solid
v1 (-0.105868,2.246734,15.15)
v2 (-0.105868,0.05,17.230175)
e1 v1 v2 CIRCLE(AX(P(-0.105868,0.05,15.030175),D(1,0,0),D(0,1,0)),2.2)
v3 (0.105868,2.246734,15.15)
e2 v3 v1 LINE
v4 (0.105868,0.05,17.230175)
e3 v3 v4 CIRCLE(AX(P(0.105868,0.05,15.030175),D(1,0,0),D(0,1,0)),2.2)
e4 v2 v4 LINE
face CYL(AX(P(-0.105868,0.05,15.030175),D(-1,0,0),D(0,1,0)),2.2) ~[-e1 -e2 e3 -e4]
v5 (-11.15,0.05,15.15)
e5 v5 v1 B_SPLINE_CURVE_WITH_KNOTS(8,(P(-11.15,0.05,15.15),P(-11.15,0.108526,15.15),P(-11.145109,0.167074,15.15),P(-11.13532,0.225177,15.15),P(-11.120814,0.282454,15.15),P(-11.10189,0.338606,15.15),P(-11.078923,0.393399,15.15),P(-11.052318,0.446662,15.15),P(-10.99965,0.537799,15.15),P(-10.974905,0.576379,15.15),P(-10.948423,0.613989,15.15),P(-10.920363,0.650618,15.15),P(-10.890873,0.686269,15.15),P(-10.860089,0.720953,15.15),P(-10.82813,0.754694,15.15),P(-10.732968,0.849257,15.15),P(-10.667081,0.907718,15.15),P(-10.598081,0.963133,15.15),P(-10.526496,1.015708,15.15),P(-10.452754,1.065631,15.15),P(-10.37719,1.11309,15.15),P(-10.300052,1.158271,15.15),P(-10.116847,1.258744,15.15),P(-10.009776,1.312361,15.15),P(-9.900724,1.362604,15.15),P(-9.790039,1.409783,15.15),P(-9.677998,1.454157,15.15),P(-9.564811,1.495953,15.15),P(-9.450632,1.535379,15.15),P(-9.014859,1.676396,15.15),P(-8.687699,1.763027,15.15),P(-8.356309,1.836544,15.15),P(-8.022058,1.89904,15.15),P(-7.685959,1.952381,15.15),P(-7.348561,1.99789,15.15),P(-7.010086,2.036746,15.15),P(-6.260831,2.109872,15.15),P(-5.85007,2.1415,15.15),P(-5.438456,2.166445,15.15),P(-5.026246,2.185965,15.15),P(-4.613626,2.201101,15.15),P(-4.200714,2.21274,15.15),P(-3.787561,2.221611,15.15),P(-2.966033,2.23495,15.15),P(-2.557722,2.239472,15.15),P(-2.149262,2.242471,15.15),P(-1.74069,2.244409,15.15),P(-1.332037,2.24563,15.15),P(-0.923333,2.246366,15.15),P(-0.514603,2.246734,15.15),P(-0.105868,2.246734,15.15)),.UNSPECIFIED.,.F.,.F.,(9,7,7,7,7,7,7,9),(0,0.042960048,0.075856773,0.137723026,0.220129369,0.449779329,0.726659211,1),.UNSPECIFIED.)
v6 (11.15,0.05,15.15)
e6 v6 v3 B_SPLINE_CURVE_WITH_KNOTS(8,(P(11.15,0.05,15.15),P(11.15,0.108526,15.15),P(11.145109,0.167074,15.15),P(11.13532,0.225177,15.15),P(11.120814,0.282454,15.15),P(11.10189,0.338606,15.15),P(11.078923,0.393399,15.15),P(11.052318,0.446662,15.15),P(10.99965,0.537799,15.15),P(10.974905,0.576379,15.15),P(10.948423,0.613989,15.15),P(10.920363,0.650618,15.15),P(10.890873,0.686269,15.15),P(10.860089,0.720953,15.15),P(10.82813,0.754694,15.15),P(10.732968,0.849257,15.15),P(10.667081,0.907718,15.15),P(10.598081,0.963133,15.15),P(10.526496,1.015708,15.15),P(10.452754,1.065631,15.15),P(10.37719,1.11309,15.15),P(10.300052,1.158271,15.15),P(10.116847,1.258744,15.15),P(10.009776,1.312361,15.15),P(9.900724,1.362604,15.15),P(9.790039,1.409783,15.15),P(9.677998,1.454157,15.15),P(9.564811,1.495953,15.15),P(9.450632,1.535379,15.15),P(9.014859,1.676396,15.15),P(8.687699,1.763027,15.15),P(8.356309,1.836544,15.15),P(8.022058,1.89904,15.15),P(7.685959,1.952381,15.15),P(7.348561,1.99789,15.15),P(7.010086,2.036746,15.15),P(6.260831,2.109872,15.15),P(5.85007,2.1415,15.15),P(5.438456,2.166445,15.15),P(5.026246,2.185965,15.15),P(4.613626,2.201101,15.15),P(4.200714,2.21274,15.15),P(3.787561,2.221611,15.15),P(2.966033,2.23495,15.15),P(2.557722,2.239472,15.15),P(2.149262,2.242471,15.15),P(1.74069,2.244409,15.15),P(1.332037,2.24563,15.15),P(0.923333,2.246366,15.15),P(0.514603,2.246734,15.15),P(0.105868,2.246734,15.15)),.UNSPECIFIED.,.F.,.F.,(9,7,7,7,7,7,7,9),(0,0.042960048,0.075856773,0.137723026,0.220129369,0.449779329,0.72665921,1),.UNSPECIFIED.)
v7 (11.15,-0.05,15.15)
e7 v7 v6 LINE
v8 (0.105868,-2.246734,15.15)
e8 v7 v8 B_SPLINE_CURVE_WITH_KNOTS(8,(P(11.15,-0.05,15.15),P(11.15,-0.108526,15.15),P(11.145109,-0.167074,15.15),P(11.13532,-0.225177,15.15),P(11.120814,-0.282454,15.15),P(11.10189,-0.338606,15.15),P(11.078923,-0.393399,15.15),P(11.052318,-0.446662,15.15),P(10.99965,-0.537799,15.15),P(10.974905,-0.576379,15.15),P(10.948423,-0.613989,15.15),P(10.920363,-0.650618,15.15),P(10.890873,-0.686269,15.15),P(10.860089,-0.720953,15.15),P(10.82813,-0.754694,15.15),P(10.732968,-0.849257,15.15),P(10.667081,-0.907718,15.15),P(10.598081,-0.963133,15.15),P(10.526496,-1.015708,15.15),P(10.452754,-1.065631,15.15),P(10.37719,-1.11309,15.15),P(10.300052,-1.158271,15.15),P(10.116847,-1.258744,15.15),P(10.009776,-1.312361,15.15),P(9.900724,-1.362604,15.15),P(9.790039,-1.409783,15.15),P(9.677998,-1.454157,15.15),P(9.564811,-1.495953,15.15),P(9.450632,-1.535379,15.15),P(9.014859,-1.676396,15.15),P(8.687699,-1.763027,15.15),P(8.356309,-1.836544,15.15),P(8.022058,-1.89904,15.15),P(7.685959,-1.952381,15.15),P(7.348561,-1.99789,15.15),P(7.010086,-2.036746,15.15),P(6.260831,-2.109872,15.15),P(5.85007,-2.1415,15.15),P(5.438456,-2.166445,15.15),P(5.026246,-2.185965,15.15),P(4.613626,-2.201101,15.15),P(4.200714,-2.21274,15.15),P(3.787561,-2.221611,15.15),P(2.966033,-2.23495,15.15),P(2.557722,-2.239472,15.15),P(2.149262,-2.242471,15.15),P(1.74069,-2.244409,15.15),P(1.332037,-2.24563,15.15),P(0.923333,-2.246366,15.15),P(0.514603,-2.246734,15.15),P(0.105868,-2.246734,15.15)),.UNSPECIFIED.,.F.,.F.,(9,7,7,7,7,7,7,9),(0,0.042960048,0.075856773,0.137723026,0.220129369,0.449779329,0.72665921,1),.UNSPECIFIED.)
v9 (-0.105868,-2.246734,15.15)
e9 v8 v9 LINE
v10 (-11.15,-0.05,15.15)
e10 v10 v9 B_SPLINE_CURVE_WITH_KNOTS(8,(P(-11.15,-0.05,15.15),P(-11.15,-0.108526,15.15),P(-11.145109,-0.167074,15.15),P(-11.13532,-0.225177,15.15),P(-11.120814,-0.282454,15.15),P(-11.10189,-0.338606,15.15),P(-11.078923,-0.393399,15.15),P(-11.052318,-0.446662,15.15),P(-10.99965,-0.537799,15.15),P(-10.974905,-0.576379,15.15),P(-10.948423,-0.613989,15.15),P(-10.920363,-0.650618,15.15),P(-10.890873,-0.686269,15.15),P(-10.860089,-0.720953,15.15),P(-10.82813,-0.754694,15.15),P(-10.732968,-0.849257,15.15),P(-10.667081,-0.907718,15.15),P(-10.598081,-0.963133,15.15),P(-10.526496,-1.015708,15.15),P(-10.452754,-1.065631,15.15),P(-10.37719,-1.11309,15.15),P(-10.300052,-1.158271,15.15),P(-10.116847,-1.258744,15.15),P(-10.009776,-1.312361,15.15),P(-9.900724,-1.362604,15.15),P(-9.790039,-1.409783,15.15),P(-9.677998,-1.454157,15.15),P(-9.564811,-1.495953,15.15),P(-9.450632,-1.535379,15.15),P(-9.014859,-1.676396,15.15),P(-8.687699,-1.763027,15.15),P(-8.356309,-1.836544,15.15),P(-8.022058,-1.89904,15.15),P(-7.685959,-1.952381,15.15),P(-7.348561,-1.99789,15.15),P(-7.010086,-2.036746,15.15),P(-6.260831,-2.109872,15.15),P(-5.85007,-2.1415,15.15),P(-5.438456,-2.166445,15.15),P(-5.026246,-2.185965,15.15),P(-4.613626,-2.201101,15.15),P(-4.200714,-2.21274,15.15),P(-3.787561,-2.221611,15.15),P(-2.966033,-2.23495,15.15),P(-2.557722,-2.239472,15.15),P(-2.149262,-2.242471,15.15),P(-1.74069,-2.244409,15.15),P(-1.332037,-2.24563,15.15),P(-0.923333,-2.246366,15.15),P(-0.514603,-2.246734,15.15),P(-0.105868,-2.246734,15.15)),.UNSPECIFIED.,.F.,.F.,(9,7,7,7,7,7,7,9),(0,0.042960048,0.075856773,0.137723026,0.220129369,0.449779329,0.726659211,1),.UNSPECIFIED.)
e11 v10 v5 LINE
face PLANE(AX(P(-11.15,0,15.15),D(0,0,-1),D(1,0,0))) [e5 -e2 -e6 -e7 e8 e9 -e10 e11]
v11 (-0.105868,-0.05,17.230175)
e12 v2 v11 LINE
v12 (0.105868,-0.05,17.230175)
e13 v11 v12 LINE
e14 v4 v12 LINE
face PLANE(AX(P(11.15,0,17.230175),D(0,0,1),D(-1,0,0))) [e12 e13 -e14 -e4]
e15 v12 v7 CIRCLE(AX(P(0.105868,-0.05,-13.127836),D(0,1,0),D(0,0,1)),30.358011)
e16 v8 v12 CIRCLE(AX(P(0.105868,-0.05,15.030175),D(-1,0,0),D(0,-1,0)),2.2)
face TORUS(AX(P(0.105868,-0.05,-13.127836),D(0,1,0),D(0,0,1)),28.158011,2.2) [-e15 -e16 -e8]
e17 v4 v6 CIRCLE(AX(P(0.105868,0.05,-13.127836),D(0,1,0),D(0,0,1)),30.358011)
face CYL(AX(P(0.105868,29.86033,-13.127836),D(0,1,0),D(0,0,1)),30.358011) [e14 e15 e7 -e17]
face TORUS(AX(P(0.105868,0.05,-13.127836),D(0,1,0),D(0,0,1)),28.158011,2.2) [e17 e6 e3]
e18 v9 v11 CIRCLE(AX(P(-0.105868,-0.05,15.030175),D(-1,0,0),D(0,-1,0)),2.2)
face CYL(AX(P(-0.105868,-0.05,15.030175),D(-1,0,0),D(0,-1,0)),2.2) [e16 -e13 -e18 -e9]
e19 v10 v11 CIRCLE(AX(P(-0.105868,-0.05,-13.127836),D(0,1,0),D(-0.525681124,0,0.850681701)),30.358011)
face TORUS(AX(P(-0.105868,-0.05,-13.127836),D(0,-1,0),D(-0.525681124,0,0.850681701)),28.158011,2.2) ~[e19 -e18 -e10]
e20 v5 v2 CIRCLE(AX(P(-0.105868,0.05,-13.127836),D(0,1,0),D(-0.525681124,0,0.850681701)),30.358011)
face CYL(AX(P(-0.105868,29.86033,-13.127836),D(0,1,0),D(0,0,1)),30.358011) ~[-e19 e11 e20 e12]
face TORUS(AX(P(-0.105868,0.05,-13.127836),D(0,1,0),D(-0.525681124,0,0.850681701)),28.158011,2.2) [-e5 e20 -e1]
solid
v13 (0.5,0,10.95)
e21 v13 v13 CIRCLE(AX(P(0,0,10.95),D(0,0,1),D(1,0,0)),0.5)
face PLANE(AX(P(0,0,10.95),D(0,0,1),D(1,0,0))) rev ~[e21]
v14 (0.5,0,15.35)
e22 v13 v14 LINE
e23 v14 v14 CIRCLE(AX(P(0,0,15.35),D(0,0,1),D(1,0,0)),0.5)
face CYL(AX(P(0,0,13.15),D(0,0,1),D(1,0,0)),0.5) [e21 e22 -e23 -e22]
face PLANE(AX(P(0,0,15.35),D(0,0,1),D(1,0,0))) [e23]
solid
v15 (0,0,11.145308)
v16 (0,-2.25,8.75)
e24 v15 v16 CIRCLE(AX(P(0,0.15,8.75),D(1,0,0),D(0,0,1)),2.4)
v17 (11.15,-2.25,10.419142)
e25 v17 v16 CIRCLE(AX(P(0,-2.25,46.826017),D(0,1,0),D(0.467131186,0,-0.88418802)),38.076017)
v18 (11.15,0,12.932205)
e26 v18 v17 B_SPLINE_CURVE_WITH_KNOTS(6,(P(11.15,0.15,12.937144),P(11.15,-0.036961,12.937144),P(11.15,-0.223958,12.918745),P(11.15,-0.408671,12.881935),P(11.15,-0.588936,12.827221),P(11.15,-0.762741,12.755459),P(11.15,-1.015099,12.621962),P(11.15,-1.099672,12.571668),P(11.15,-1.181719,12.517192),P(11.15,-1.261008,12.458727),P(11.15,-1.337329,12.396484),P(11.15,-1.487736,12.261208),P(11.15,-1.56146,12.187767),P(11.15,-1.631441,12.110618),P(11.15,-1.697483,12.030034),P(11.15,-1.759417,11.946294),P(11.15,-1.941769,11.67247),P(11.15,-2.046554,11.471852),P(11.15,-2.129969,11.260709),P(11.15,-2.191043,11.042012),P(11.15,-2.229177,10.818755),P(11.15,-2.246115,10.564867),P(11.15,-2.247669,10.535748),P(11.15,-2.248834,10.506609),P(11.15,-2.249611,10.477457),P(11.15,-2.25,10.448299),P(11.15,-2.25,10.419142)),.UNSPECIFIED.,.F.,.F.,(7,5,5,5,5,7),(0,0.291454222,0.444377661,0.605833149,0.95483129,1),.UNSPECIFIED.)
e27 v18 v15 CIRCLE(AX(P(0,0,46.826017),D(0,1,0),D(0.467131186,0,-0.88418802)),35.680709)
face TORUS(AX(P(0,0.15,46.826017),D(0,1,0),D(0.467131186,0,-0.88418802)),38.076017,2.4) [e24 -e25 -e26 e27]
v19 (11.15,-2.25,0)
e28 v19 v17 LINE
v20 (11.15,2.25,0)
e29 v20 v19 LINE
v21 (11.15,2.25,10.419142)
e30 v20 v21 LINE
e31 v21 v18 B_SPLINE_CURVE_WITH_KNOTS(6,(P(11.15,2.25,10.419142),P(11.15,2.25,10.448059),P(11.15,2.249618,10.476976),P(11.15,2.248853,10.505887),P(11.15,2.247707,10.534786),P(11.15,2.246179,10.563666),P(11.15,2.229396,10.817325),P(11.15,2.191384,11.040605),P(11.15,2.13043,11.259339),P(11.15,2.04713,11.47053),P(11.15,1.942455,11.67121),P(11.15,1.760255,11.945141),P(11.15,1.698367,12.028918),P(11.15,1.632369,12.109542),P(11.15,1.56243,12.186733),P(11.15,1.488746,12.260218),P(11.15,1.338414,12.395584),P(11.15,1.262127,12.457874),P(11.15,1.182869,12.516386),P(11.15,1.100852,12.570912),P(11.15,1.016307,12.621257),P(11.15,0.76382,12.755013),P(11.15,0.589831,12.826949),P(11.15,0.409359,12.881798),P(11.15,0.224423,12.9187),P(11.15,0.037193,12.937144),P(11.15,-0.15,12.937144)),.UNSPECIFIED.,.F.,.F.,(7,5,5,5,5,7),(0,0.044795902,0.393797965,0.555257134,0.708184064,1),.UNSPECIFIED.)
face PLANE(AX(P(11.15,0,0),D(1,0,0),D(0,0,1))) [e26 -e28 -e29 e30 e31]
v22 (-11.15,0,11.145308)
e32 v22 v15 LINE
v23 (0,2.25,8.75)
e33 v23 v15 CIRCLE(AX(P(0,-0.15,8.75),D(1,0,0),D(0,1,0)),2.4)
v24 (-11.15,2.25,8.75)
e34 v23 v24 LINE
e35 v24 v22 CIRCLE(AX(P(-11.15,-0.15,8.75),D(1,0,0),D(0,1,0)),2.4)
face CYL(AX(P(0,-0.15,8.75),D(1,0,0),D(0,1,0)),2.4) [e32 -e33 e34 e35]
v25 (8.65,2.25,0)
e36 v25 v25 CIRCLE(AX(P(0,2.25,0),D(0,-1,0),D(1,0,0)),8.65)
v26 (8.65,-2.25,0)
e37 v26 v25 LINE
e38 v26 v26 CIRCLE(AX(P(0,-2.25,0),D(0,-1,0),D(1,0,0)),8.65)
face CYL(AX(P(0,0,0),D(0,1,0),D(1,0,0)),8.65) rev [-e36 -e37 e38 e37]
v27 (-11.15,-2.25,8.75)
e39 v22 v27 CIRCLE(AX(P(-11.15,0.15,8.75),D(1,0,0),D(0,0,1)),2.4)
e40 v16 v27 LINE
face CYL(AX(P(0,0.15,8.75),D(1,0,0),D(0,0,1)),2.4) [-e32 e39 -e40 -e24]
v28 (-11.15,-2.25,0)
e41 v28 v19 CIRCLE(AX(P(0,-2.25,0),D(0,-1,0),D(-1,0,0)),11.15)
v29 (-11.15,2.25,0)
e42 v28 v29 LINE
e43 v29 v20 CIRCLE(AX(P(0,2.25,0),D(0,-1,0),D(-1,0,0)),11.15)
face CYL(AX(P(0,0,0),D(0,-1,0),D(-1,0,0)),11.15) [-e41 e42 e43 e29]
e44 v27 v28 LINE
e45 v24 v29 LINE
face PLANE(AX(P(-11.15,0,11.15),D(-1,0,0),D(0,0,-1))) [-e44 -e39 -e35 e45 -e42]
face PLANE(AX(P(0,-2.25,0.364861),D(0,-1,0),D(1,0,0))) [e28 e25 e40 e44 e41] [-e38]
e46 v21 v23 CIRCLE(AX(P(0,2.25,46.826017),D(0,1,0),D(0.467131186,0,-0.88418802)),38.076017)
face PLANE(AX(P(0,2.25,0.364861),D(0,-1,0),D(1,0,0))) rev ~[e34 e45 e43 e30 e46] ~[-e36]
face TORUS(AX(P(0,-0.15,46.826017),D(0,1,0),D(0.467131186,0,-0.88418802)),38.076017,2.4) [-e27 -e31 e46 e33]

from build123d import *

# Parameters (mm, degrees)
F0_R          = 8.65
F1_DEPTH      = 2.25
F1_DEPTH_BACK = 2.25
F5_T1_DEPTH   = 59.7206593681
F6_T1_DEPTH   = 0.2117362528
F6_T4_ANGLE   = 31.7141074843
F6_T6_ANGLE   = 31.7141074843
F6_T8_ANGLE   = 31.7141074843
F6_T10_ANGLE  = 31.7141074843
F7_T3_DEPTH   = 17.15
F7_T6_DEPTH   = 17.15
F7_T9_ANGLE   = 27.8482361684
F7_T12_ANGLE  = 27.8482361684
F8_R          = 0.5
F9_DEPTH      = 2.2
F9_DEPTH_BACK = 2.2


# Not quite as in the source:
# - a fillet or chamfer that OpenCascade refuses, or shapes differently, is made with other operations: its cross-section is extruded or revolved along the edge and cut away or added
# - the program builds the solid bodies; features that only make, move or delete a surface that nothing else refers to are left out


with BuildPart() as f1:
    # F0 (on Front) → F1 (new body, two sides)
    with BuildSketch(Plane.XZ) as f1_sk:
        with BuildLine():
            ThreePointArc((-11.15, 0), (0, -11.15), (11.15, 0))
            ThreePointArc((11.15, 0), (7.8842406102, 7.8842406102), (0, 11.15))
            ThreePointArc((0, 11.15), (-7.8842406102, 7.8842406102), (-11.15, 0))
        make_face()
        Circle(F0_R, mode=Mode.SUBTRACT)
        with BuildLine():
            ThreePointArc((-11.15, 0), (-7.8842406102, 7.8842406102), (0, 11.15))
            Line((0, 11.15), (-4, 11.15))
            Line((-4, 11.15), (-9.15, 11.15))
            Line((-9.15, 11.15), (-11.15, 11.15))
            Line((-11.15, 11.15), (-11.15, 0))
        make_face()
        with BuildLine():
            ThreePointArc((0, 11.15), (7.8842406102, 7.8842406102), (11.15, 0))
            Line((11.15, 0), (11.15, 11.15))
            Line((11.15, 11.15), (0, 11.15))
        make_face()
        with BuildLine():
            ThreePointArc((11.15, 12.9371443763), (5.6461576541, 11.5996193357), (0, 11.15))
            Line((0, 11.15), (11.15, 11.15))
            Line((11.15, 11.15), (11.15, 12.9371443763))
        make_face()
    extrude(amount=F1_DEPTH)
    extrude(f1_sk.sketch, amount=-F1_DEPTH_BACK)

    # F7: fillet of radius 2.4 on 2 edges, made by hand


with BuildPart() as f1b:
    # F0 (on Front) → F1, piece 2 (new body, two sides)
    with BuildSketch(Plane.XZ) as f1_2_sk:
        Polygon((-9.15, 15.15), (-4, 15.15), (0, 15.15), (11.15, 15.15), (11.15, 17.2301754355), (-11.15, 17.2301754355), (-11.15, 15.15), align=None)
    extrude(amount=F1_DEPTH)
    extrude(f1_2_sk.sketch, amount=-F1_DEPTH_BACK)

    # F5: fillet of radius 30.3580112828 on 2 edges, made by hand

    # F5_s2 → F5_t1 (cut)
    with BuildSketch(Plane.XZ.offset(-29.8603296841)):
        with BuildLine():
            ThreePointArc((-0.1058681264, 17.2301754355), (-5.725031291, 16.7055993283), (-11.15, 15.15))
            Line((-11.15, 15.15), (-11.3708826375, 15.7155567169))
            ThreePointArc((-11.3708826375, 15.7155567169), (-11.7571602257, 16.1900877178), (-11.7571602257, 17.2301754355))
            Line((-11.7571602257, 17.2301754355), (-11.15, 17.8373356612))
            Line((-11.15, 17.8373356612), (-0.1058681264, 17.8373356612))
            Line((-0.1058681264, 17.8373356612), (-0.1058681264, 17.2301754355))
        make_face()
        with BuildLine():
            ThreePointArc((0.1058681264, 17.2301754355), (5.725031291, 16.7055993283), (11.15, 15.15))
            Line((11.15, 15.15), (11.3708826375, 15.7155567169))
            ThreePointArc((11.3708826375, 15.7155567169), (11.7571602257, 16.1900877178), (11.7571602257, 17.2301754355))
            Line((11.7571602257, 17.2301754355), (11.15, 17.8373356612))
            Line((11.15, 17.8373356612), (0.1058681264, 17.8373356612))
            Line((0.1058681264, 17.8373356612), (0.1058681264, 17.2301754355))
        make_face()
    extrude(amount=F5_T1_DEPTH, mode=Mode.SUBTRACT)

    # F6: fillet of radius 2.2 on 2 edges, made by hand

    # F6_s2 → F6_t1 (cut)
    with BuildSketch(Plane.YZ.offset(-0.1058681264)):
        with BuildLine():
            ThreePointArc((2.25, 15.0301754355), (1.6056349186, 16.5858103542), (0.05, 17.2301754355))
            Line((0.05, 17.2301754355), (2.25, 17.2301754355))
            Line((2.25, 17.2301754355), (2.25, 15.0301754355))
        make_face()
        with BuildLine():
            ThreePointArc((-2.25, 15.0301754355), (-1.6056349186, 16.5858103542), (-0.05, 17.2301754355))
            Line((-0.05, 17.2301754355), (-2.25, 17.2301754355))
            Line((-2.25, 17.2301754355), (-2.25, 15.0301754355))
        make_face()
    extrude(amount=F6_T1_DEPTH, mode=Mode.SUBTRACT)

    # F6_s3 → F6_t4 (revolve, cut)
    with BuildSketch(Plane(origin=(-5.9472140901, 0, -3.6750974915), x_dir=(0, 1, 0), z_dir=(-0.8506817009, 0, -0.5256811236))):
        with BuildLine():
            ThreePointArc((-0.05, -19.2460544304), (-1.6056349186, -18.601689349), (-2.25, -17.0460544304))
            Line((-2.25, -17.0460544304), (-2.25, -19.2460544304))
            Line((-2.25, -19.2460544304), (-0.05, -19.2460544304))
        make_face()
    revolve(axis=Axis((-0.1058681264, -2.25, -13.1278358476), (0, 1, 0)), revolution_arc=F6_T4_ANGLE, mode=Mode.SUBTRACT)

    # F6_s5 → F6_t6 (revolve, cut)
    with BuildSketch(Plane.YZ.offset(0.1058681264)):
        with BuildLine():
            ThreePointArc((0.05, 17.2301754355), (1.6056349186, 16.5858103541), (2.25, 15.0301754355))
            Line((2.25, 15.0301754355), (2.25, 17.2301754355))
            Line((2.25, 17.2301754355), (0.05, 17.2301754355))
        make_face()
    revolve(axis=Axis((0.1058681264, 2.25, -13.1278358476), (0, 1, 0)), revolution_arc=F6_T6_ANGLE, mode=Mode.SUBTRACT)

    # F6_s7 → F6_t8 (revolve, cut)
    with BuildSketch(Plane(origin=(-5.9472140901, 0, -3.6750974915), x_dir=(0, 1, 0), z_dir=(-0.8506817009, 0, -0.5256811236))):
        with BuildLine():
            ThreePointArc((0.05, -19.2460544304), (1.6056349186, -18.601689349), (2.25, -17.0460544304))
            Line((2.25, -17.0460544304), (2.25, -19.2460544304))
            Line((2.25, -19.2460544304), (0.05, -19.2460544304))
        make_face()
    revolve(axis=Axis((-0.1058681264, 2.25, -13.1278358476), (0, 1, 0)), revolution_arc=F6_T8_ANGLE, mode=Mode.SUBTRACT)

    # F6_s9 → F6_t10 (revolve, cut)
    with BuildSketch(Plane.YZ.offset(0.1058681264)):
        with BuildLine():
            ThreePointArc((-2.25, 15.0301754355), (-1.6056349186, 16.5858103541), (-0.05, 17.2301754355))
            Line((-0.05, 17.2301754355), (-2.25, 17.2301754355))
            Line((-2.25, 17.2301754355), (-2.25, 15.0301754355))
        make_face()
    revolve(axis=Axis((0.1058681264, -2.25, -13.1278358476), (0, 1, 0)), revolution_arc=F6_T10_ANGLE, mode=Mode.SUBTRACT)


with BuildPart() as f7_tool1:
    # F7_s2 → F7_t3 (new body)
    with BuildSketch(Plane.YZ):
        with BuildLine():
            ThreePointArc((0.15, 11.15), (-1.5470562748, 10.4470562748), (-2.25, 8.75))
            Line((-2.25, 8.75), (-2.25, 11.15))
            Line((-2.25, 11.15), (0.15, 11.15))
        make_face()
    extrude(amount=-F7_T3_DEPTH)


with BuildPart() as f7_tool4:
    # F7_s5 → F7_t6 (new body)
    with BuildSketch(Plane.YZ):
        with BuildLine():
            ThreePointArc((2.25, 8.75), (1.5470562748, 10.4470562748), (-0.15, 11.15))
            Line((-0.15, 11.15), (2.25, 11.15))
            Line((2.25, 11.15), (2.25, 8.75))
        make_face()
    extrude(amount=-F7_T6_DEPTH)


with BuildPart() as f7_tool7:
    # F7_s8 → F7_t9 (revolve)
    with BuildSketch(Plane(origin=(19.3406338701, 0, 10.217977433), x_dir=(0, 1, 0), z_dir=(0.8841880202, 0, 0.467131186))):
        with BuildLine():
            ThreePointArc((2.25, 3.3269863074), (1.5470562748, 5.0240425823), (-0.15, 5.7269863074))
            Line((-0.15, 5.7269863074), (2.25, 5.7269863074))
            Line((2.25, 5.7269863074), (2.25, 3.3269863074))
        make_face()
    revolve(axis=Axis((0, 2.25, 46.8260166415), (0, 1, 0)), revolution_arc=F7_T9_ANGLE)


with BuildPart() as f7_tool10:
    # F7_s11 → F7_t12 (revolve)
    with BuildSketch(Plane(origin=(19.3406338701, 0, 10.217977433), x_dir=(0, 1, 0), z_dir=(0.8841880202, 0, 0.467131186))):
        with BuildLine():
            ThreePointArc((0.15, 5.7269863074), (-1.5470562748, 5.0240425823), (-2.25, 3.3269863074))
            Line((-2.25, 3.3269863074), (-2.25, 5.7269863074))
            Line((-2.25, 5.7269863074), (0.15, 5.7269863074))
        make_face()
    revolve(axis=Axis((0, -2.25, 46.8260166415), (0, 1, 0)), revolution_arc=F7_T12_ANGLE)


with BuildPart() as f1_1:
    add(f1.part)

    # F7_t13: cut F7_tool1, F7_tool4, F7_tool7, F7_tool10
    add([f7_tool1.part, f7_tool4.part, f7_tool7.part, f7_tool10.part], mode=Mode.SUBTRACT)


with BuildPart() as f9:
    # F8 (on offset) → F9 (new body, two sides)
    with BuildSketch(Plane.XY.offset(13.15)) as f9_sk:
        Circle(F8_R)
    extrude(amount=F9_DEPTH)
    extrude(f9_sk.sketch, amount=-F9_DEPTH_BACK)


solid = Compound([f1b.part, f1_1.part, f9.part])
